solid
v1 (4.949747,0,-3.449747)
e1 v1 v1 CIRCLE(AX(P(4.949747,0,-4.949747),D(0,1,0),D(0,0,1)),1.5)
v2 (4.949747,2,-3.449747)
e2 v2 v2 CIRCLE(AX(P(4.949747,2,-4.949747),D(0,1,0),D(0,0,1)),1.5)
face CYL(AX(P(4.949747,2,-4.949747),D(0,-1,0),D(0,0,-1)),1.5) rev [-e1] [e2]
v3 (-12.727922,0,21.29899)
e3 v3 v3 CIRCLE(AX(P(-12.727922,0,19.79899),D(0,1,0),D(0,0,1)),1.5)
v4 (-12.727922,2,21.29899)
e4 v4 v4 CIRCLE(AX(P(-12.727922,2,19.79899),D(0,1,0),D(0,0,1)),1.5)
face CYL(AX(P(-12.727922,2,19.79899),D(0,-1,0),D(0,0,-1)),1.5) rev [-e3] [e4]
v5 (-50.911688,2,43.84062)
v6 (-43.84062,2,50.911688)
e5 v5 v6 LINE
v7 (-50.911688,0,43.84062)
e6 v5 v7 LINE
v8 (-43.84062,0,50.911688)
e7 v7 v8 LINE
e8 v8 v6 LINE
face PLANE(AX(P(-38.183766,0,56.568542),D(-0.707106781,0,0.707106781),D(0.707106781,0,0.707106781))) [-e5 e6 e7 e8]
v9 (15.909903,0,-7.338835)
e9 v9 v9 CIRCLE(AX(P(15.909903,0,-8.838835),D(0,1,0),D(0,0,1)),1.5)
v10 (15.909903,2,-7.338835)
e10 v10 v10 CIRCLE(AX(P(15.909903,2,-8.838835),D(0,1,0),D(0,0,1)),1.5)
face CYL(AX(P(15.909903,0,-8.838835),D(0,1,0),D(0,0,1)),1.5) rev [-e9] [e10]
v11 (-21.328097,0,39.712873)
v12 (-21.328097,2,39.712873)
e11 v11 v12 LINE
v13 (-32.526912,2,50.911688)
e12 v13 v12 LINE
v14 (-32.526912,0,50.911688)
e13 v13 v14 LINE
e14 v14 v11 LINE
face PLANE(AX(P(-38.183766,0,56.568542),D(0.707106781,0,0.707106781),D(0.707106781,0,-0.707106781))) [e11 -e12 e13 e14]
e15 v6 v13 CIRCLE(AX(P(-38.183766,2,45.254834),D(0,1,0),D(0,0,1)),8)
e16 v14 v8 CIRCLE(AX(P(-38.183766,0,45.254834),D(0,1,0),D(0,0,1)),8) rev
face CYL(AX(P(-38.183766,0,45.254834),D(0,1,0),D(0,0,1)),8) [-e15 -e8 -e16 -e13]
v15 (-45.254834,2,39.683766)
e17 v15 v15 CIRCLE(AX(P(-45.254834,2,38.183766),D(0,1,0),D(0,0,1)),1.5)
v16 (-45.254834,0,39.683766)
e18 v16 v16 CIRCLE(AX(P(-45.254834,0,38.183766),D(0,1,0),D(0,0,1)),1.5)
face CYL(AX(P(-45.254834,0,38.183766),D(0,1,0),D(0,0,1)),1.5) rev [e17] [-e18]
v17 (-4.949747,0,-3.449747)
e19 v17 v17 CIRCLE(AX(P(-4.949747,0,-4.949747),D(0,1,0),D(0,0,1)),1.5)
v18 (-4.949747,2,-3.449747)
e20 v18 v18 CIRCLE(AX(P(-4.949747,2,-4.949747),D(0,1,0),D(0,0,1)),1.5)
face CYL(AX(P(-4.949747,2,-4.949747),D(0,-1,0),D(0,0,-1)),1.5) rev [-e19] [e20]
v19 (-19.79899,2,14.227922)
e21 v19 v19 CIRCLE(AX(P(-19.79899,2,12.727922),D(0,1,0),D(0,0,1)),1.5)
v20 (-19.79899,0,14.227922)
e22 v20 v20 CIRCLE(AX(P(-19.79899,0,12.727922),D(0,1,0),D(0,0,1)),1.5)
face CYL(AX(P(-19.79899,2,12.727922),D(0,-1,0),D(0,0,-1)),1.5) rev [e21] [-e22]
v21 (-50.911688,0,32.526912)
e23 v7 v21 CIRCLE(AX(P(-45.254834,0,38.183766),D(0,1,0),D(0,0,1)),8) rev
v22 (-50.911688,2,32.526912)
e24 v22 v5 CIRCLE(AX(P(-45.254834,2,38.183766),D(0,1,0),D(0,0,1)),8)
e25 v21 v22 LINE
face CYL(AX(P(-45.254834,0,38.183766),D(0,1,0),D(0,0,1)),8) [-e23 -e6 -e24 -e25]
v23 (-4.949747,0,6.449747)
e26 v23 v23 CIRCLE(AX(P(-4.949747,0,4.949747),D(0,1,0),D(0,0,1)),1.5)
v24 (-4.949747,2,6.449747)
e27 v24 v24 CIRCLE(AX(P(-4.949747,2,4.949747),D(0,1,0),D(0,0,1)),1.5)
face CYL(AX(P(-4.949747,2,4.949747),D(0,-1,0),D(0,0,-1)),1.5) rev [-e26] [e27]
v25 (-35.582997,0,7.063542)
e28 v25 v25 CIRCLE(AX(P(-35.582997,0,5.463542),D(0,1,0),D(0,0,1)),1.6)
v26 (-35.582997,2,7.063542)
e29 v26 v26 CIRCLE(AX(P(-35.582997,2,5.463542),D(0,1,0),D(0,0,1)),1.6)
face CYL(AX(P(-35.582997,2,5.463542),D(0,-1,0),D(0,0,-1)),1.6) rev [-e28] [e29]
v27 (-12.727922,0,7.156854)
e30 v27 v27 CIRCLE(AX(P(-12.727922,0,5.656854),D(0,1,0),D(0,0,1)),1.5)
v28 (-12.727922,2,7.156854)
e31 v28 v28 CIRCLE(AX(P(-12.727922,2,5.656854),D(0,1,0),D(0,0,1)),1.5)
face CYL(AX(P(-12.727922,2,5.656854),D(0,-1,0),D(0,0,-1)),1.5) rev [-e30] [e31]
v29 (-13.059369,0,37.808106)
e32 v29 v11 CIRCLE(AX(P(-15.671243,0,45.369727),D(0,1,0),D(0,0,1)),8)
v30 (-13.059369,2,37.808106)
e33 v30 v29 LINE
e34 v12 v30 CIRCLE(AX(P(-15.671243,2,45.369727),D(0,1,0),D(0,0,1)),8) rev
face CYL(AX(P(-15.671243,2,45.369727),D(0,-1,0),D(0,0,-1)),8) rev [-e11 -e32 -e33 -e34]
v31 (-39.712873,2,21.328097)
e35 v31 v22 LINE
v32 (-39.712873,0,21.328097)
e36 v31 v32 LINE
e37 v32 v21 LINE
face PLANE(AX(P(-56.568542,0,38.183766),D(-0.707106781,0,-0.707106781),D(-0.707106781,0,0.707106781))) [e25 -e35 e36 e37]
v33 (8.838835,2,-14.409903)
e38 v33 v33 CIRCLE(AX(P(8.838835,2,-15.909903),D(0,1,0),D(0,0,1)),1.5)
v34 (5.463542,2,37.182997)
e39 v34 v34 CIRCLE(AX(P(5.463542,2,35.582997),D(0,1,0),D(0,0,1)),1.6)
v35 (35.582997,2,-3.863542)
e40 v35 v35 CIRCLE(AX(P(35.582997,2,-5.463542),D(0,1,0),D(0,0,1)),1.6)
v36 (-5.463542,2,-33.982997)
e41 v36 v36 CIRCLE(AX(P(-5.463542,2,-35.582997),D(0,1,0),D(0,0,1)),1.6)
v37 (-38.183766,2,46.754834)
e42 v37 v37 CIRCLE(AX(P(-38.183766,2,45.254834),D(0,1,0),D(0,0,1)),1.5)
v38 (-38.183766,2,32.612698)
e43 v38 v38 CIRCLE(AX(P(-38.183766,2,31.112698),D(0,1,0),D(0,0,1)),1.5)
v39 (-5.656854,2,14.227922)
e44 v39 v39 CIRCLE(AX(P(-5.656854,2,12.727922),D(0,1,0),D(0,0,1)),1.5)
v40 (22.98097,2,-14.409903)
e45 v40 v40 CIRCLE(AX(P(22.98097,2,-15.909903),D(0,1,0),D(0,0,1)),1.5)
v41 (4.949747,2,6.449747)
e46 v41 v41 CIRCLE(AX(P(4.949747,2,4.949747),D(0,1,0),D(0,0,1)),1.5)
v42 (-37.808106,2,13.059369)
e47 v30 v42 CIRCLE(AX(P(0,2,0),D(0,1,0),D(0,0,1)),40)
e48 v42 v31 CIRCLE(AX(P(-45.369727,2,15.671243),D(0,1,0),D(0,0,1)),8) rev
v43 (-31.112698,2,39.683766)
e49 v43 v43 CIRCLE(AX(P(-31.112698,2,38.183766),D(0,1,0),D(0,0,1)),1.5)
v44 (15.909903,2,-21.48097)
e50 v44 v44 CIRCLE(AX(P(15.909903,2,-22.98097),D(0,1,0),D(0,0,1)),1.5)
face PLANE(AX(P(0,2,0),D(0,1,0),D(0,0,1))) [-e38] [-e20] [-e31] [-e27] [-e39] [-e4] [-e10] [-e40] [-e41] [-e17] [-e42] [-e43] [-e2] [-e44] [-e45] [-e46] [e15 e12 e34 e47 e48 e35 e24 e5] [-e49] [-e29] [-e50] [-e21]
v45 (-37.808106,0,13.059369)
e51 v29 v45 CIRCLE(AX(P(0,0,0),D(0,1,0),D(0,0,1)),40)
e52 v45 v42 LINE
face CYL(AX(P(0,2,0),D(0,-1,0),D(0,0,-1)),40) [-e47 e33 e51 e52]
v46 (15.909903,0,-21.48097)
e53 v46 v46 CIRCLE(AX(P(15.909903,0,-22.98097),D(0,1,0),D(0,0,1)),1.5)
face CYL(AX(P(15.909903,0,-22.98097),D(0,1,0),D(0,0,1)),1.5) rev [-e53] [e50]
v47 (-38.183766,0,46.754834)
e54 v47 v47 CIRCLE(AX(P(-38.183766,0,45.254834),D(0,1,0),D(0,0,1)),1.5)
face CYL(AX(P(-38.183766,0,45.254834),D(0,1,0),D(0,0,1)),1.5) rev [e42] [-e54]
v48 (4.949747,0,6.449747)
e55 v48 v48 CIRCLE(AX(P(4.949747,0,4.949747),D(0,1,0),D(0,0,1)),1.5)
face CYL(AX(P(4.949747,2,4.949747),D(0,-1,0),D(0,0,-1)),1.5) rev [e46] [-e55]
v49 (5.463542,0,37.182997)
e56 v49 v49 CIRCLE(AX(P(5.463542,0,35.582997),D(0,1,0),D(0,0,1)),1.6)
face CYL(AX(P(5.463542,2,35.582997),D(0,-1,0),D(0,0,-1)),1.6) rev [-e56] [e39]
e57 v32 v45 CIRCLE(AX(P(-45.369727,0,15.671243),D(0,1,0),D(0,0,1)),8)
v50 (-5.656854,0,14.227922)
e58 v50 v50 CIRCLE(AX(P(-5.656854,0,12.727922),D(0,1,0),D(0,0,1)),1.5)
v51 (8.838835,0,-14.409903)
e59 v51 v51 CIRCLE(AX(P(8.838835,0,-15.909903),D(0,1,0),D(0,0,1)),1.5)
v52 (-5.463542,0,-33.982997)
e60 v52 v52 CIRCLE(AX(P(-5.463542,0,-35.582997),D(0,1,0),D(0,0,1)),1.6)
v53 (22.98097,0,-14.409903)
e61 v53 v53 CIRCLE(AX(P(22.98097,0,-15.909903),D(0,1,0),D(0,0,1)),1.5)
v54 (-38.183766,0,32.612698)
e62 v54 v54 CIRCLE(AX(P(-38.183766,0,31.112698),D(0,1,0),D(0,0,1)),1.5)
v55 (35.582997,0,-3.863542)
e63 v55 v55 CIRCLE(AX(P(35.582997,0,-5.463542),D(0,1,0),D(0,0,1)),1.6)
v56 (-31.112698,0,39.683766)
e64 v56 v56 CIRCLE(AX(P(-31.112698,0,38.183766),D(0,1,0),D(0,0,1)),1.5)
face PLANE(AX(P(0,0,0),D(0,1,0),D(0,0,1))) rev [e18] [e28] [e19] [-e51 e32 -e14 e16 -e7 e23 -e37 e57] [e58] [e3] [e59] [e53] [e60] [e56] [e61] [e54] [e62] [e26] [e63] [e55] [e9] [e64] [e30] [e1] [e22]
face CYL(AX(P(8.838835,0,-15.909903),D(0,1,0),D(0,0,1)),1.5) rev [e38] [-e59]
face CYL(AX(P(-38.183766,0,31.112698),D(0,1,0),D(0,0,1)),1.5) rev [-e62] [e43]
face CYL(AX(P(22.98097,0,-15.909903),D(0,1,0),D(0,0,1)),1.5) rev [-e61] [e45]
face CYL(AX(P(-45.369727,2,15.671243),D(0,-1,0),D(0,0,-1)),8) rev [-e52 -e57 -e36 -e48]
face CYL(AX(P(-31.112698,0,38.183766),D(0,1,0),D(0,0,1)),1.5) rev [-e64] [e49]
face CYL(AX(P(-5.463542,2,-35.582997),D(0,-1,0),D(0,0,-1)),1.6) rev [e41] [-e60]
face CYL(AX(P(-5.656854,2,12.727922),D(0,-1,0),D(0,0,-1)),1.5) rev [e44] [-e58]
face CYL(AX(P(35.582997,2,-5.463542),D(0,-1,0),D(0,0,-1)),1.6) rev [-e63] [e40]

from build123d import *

# Parameters (mm, degrees)
SKETCH_1_R          = 40
SKETCH_1_R_2        = 1.5
SKETCH_1_R_3        = 1.6
EXTRUDE_9_DEPTH     = 2
SKETCH_2_R          = 1.5
CUT_EXTRUDE_1_DEPTH = 2
FILLET_2_OUTLINE_R  = 1.5
FILLET_2_DEPTH      = 2


with BuildPart() as part:
    # 草图1 → 凸台-拉伸9 (new body)
    with BuildSketch(Plane(origin=(0, 0, 0), x_dir=(1, 0, 0), z_dir=(0, 1, 0))):
        with Locations(Location((0, 0, 0), (0, 0, 270))):
            Circle(SKETCH_1_R)
        with Locations(Location((-12.727922062, -5.656854248, 0), (0, 0, 270))):
            Circle(SKETCH_1_R_2, mode=Mode.SUBTRACT)
        with Locations(Location((-5.656854248, -12.727922062, 0), (0, 0, 270))):
            Circle(SKETCH_1_R_2, mode=Mode.SUBTRACT)
        with Locations(Location((-19.798989874, -12.727922061, 0), (0, 0, 270))):
            Circle(SKETCH_1_R_2, mode=Mode.SUBTRACT)
        with Locations(Location((-12.727922061, -19.798989874, 0), (0, 0, 270))):
            Circle(SKETCH_1_R_2, mode=Mode.SUBTRACT)
        with Locations(Location((4.949747468, 4.949747468, 0), (0, 0, 270))):
            Circle(SKETCH_1_R_2, mode=Mode.SUBTRACT)
        with Locations(Location((-4.949747468, 4.949747468, 0), (0, 0, 270))):
            Circle(SKETCH_1_R_2, mode=Mode.SUBTRACT)
        with Locations(Location((-4.949747468, -4.949747468, 0), (0, 0, 270))):
            Circle(SKETCH_1_R_2, mode=Mode.SUBTRACT)
        with Locations(Location((4.949747468, -4.949747468, 0), (0, 0, 270))):
            Circle(SKETCH_1_R_2, mode=Mode.SUBTRACT)
        with Locations(Location((35.582997469, 5.463541991, 0), (0, 0, 270))):
            Circle(SKETCH_1_R_3, mode=Mode.SUBTRACT)
        with Locations(Location((5.463541991, -35.582997469, 0), (0, 0, 270))):
            Circle(SKETCH_1_R_3, mode=Mode.SUBTRACT)
        with Locations(Location((-35.582997469, -5.463541991, 0), (0, 0, 270))):
            Circle(SKETCH_1_R_3, mode=Mode.SUBTRACT)
        with Locations(Location((-5.463541991, 35.582997469, 0), (0, 0, 270))):
            Circle(SKETCH_1_R_3, mode=Mode.SUBTRACT)
    extrude(amount=EXTRUDE_9_DEPTH)

    # 草图2 → 切除-拉伸1 (cut)
    with BuildSketch(Plane(origin=(0, 2, 0), x_dir=(1, 0, 0), z_dir=(0, 1, 0))):
        with Locations(Location((8.838834765, 15.909902577, 0), (0, 0, 270))):
            Circle(SKETCH_2_R)
        with Locations(Location((15.909902577, 8.838834765, 0), (0, 0, 270))):
            Circle(SKETCH_2_R)
        with Locations(Location((15.909902576, 22.980970389, 0), (0, 0, 270))):
            Circle(SKETCH_2_R)
        with Locations(Location((22.980970389, 15.909902576, 0), (0, 0, 270))):
            Circle(SKETCH_2_R)
    extrude(amount=-CUT_EXTRUDE_1_DEPTH, mode=Mode.SUBTRACT)

    # 圆角2: read off the stored shape, not the designer's step
    # 圆角2 outline → 圆角2 (add)
    with BuildSketch(Plane(origin=(0, 0, 0), x_dir=(1, 0, 0), z_dir=(0, 1, 0))):
        with BuildLine():
            ThreePointArc((-37.808106107, -13.059368767), (-37.573895805, -17.467074044), (-39.712873079, -21.32809677))
            Line((-39.712873079, -21.32809677), (-50.911688244, -32.526911935))
            ThreePointArc((-50.911688244, -32.526911935), (-53.254833995, -38.183766185), (-50.911688244, -43.840620434))
            Line((-50.911688244, -43.840620434), (-43.840620432, -50.911688246))
            ThreePointArc((-43.840620432, -50.911688246), (-38.183766183, -53.254833997), (-32.526911933, -50.911688246))
            Line((-32.526911933, -50.911688246), (-21.328096767, -39.71287308))
            ThreePointArc((-21.328096767, -39.71287308), (-17.467074041, -37.573895806), (-13.059368765, -37.808106108))
            ThreePointArc((-13.059368765, -37.808106108), (-28.284271247, -28.284271248), (-37.808106107, -13.059368767))
        make_face()
        with Locations((-38.18376618, -45.254833999)):
            Circle(FILLET_2_OUTLINE_R, mode=Mode.SUBTRACT)
        with Locations((-45.254833993, -38.183766188)):
            Circle(FILLET_2_OUTLINE_R, mode=Mode.SUBTRACT)
        with Locations((-31.112698372, -38.183766184)):
            Circle(FILLET_2_OUTLINE_R, mode=Mode.SUBTRACT)
        with Locations((-38.183766184, -31.112698372)):
            Circle(FILLET_2_OUTLINE_R, mode=Mode.SUBTRACT)
    extrude(amount=FILLET_2_DEPTH)


solid = part.part
